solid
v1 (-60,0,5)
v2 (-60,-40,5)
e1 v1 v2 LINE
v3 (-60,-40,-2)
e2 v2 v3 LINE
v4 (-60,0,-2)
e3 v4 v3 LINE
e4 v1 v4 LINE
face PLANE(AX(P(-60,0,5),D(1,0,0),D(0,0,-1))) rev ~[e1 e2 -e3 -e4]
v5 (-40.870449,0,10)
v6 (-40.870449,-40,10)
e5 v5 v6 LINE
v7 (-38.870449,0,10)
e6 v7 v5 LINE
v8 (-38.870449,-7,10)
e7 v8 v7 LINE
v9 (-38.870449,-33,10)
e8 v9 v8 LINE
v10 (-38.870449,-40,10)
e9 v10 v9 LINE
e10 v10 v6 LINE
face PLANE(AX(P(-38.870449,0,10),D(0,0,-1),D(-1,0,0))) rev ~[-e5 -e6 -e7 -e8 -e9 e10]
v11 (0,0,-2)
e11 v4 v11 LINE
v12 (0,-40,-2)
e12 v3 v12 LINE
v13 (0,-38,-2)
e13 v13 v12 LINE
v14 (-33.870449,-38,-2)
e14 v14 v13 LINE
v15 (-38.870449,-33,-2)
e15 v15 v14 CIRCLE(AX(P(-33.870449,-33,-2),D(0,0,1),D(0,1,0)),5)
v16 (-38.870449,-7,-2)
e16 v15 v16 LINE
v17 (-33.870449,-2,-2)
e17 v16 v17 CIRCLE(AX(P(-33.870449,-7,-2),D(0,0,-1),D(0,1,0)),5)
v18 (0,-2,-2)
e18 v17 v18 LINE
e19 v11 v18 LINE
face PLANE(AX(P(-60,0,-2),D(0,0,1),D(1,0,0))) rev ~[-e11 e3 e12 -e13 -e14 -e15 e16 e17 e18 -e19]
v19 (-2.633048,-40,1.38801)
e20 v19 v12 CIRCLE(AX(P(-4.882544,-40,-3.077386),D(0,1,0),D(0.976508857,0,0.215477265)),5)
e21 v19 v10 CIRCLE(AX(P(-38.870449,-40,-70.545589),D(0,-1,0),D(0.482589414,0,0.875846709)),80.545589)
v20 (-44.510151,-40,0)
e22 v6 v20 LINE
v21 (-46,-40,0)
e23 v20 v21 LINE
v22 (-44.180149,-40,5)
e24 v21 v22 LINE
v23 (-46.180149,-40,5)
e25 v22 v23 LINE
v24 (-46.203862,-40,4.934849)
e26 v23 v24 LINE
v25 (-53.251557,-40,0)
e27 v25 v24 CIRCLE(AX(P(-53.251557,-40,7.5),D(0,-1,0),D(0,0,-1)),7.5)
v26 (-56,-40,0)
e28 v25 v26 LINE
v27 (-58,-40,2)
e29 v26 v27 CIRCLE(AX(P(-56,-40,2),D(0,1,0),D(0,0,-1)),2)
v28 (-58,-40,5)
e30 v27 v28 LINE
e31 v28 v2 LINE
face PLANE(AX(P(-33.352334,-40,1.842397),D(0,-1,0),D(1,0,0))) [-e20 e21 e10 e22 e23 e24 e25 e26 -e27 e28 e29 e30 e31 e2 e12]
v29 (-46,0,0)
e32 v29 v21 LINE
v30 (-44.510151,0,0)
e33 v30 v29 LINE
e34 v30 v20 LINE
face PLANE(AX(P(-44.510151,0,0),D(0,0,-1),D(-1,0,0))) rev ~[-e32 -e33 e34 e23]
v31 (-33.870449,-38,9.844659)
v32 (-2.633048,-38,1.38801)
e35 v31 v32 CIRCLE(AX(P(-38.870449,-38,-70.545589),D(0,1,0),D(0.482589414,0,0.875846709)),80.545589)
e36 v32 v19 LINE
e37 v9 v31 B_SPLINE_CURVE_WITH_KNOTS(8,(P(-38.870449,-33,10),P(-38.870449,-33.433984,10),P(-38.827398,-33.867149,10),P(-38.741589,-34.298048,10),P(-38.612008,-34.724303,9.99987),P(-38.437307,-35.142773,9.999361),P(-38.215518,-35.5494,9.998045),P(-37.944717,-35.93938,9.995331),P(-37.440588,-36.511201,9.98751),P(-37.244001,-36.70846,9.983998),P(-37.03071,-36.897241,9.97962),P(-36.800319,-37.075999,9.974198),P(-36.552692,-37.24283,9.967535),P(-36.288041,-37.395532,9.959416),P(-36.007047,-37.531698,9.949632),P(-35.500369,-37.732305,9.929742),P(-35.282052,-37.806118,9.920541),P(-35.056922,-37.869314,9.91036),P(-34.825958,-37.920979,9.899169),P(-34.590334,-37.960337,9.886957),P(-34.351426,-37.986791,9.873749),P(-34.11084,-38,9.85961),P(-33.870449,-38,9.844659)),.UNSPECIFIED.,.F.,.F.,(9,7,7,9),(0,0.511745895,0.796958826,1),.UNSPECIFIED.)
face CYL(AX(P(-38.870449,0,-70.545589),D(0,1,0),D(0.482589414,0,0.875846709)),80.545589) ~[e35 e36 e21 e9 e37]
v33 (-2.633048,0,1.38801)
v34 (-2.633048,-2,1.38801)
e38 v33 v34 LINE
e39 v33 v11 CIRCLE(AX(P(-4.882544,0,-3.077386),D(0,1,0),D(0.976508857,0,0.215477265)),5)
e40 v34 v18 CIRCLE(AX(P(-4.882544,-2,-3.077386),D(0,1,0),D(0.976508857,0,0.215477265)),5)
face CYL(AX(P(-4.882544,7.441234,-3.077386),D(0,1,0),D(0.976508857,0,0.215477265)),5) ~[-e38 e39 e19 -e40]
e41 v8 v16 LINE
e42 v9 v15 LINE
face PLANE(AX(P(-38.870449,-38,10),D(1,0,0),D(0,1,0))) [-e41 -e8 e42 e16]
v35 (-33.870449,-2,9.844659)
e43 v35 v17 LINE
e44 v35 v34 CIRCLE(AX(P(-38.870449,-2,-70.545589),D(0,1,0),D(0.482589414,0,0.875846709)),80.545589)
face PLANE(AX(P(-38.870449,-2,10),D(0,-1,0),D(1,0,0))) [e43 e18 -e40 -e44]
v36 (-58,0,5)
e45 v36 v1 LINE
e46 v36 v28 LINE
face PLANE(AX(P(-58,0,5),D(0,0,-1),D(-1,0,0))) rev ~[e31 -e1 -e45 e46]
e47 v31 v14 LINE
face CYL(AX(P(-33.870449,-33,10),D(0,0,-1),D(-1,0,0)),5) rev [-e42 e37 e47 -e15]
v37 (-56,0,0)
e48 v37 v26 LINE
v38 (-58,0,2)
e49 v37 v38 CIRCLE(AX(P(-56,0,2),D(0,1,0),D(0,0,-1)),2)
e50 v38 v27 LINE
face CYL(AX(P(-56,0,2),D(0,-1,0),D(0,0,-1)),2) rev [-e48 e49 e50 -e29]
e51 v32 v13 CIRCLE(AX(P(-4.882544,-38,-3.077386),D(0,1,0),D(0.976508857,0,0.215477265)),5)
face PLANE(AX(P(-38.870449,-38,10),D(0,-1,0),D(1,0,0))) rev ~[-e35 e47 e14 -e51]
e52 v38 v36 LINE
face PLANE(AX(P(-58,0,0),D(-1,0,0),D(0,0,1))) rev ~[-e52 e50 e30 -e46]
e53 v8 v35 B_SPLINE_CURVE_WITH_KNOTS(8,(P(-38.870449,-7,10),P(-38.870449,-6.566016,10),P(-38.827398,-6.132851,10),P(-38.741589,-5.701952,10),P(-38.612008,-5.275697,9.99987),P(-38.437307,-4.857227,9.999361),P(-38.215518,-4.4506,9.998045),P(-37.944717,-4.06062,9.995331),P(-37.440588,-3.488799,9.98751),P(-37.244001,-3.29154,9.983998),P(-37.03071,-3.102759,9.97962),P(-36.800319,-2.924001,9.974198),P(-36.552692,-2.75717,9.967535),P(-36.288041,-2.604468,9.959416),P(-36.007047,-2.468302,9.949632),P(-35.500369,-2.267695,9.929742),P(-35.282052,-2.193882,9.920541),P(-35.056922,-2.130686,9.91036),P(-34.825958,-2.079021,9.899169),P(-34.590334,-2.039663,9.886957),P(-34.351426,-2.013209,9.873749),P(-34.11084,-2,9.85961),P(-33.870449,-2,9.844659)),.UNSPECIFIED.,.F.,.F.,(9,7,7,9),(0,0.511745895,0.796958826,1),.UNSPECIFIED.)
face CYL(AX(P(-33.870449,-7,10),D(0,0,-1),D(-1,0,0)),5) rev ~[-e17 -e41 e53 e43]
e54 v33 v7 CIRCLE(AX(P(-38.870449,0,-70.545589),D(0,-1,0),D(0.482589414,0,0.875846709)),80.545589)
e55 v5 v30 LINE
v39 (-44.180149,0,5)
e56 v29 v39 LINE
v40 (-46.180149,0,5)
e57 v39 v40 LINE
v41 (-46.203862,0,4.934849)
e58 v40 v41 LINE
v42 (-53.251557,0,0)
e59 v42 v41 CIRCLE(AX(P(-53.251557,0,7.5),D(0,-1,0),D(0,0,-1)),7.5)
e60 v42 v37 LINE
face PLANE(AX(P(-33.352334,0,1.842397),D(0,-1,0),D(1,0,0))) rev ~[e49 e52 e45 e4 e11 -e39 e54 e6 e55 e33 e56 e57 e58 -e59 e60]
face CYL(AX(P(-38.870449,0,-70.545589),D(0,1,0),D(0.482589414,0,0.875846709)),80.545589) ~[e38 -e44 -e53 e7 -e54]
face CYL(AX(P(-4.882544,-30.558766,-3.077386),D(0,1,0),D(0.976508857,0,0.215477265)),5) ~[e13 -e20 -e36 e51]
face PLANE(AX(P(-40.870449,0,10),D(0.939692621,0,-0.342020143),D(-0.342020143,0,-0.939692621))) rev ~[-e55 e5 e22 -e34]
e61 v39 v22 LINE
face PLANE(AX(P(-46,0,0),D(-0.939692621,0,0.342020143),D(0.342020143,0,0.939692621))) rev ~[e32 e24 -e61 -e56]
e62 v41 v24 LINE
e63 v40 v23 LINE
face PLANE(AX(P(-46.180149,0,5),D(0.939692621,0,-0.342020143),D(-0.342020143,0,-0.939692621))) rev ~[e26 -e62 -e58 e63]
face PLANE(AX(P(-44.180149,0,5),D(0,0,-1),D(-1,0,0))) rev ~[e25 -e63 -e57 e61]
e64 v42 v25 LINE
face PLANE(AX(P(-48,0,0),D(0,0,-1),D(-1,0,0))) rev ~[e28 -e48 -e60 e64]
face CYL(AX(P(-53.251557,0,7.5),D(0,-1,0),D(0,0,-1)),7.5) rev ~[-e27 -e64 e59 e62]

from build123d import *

# Parameters (mm, degrees)
F1_DEPTH    = 40
F2_W        = 38.8704487759
F2_H        = 36
F3_DEPTH    = 25
F4_R        = 7.5
F5_R        = 2
F6_T1_DEPTH = 16.8824680596
F6_T3_DEPTH = 16.8824680596
F7_R        = 5


# Not quite as in the source:
# - a fillet or chamfer that OpenCascade refuses, or shapes differently, is made with other operations: its cross-section is extruded or revolved along the edge and cut away or added


with BuildPart() as f1:
    # F0 (on Front) → F1 (new body)
    with BuildSketch(Plane.XZ):
        with BuildLine():
            Line((-48, 0), (-58, 0))
            Line((-58, 0), (-58, 5))
            Line((-58, 5), (-60, 5))
            Line((-60, 5), (-60, -2))
            Line((-60, -2), (0, -2))
            Line((0, -2), (0, 0))
            ThreePointArc((0, 0), (-18.8023659823, 7.4599490238), (-38.8704487759, 10))
            Line((-38.8704487759, 10), (-40.8704487759, 10))
            Line((-40.8704487759, 10), (-44.5101511185, 0))
            Line((-44.5101511185, 0), (-46, 0))
            Line((-46, 0), (-44.1801488287, 5))
            Line((-44.1801488287, 5), (-46.1801488287, 5))
            Line((-46.1801488287, 5), (-48, 0))
        make_face()
    extrude(amount=F1_DEPTH)

    # F2 (on face) → F3 (cut)
    with BuildSketch(Plane.XY.offset(10)):
        with Locations((-19.4352243879, -20)):
            Rectangle(F2_W, F2_H)
    extrude(amount=-F3_DEPTH, mode=Mode.SUBTRACT)

    # F4
    f4_edges = [f1.edges().sort_by_distance(p)[0] for p in [
        (-48, -20, 0),
    ]]
    fillet(f4_edges, radius=F4_R)

    # F5
    f5_edges = [f1.edges().sort_by_distance(p)[0] for p in [
        (-58, -20, 0),
    ]]
    fillet(f5_edges, radius=F5_R)

    # F6: fillet of radius 5 on 2 edges, made by hand

    # F6_s2 → F6_t1 (cut)
    with BuildSketch(Plane.XZ.offset(30.5587659702)):
        with BuildLine():
            ThreePointArc((0, -2), (-0.9346139409, -0.0091871804), (-2.6330480047, 1.3880102401))
            ThreePointArc((-2.6330480047, 1.3880102401), (-1.3101118631, 0.7061689139), (0, 0))
            Line((0, 0), (0, -2))
        make_face()
    extrude(amount=F6_T1_DEPTH, mode=Mode.SUBTRACT)

    # F6_s4 → F6_t3 (cut)
    with BuildSketch(Plane.XZ.offset(-7.4412340298)):
        with BuildLine():
            ThreePointArc((0, -2), (-0.9346139409, -0.0091871804), (-2.6330480047, 1.3880102401))
            ThreePointArc((-2.6330480047, 1.3880102401), (-1.3101118631, 0.7061689139), (0, 0))
            Line((0, 0), (0, -2))
        make_face()
    extrude(amount=F6_T3_DEPTH, mode=Mode.SUBTRACT)

    # F7
    f7_edges = [f1.edges().sort_by_distance(p)[0] for p in [
        (-38.870449, -38, 4),
        (-38.870449, -2, 4),
    ]]
    fillet(f7_edges, radius=F7_R)


solid = f1.part
